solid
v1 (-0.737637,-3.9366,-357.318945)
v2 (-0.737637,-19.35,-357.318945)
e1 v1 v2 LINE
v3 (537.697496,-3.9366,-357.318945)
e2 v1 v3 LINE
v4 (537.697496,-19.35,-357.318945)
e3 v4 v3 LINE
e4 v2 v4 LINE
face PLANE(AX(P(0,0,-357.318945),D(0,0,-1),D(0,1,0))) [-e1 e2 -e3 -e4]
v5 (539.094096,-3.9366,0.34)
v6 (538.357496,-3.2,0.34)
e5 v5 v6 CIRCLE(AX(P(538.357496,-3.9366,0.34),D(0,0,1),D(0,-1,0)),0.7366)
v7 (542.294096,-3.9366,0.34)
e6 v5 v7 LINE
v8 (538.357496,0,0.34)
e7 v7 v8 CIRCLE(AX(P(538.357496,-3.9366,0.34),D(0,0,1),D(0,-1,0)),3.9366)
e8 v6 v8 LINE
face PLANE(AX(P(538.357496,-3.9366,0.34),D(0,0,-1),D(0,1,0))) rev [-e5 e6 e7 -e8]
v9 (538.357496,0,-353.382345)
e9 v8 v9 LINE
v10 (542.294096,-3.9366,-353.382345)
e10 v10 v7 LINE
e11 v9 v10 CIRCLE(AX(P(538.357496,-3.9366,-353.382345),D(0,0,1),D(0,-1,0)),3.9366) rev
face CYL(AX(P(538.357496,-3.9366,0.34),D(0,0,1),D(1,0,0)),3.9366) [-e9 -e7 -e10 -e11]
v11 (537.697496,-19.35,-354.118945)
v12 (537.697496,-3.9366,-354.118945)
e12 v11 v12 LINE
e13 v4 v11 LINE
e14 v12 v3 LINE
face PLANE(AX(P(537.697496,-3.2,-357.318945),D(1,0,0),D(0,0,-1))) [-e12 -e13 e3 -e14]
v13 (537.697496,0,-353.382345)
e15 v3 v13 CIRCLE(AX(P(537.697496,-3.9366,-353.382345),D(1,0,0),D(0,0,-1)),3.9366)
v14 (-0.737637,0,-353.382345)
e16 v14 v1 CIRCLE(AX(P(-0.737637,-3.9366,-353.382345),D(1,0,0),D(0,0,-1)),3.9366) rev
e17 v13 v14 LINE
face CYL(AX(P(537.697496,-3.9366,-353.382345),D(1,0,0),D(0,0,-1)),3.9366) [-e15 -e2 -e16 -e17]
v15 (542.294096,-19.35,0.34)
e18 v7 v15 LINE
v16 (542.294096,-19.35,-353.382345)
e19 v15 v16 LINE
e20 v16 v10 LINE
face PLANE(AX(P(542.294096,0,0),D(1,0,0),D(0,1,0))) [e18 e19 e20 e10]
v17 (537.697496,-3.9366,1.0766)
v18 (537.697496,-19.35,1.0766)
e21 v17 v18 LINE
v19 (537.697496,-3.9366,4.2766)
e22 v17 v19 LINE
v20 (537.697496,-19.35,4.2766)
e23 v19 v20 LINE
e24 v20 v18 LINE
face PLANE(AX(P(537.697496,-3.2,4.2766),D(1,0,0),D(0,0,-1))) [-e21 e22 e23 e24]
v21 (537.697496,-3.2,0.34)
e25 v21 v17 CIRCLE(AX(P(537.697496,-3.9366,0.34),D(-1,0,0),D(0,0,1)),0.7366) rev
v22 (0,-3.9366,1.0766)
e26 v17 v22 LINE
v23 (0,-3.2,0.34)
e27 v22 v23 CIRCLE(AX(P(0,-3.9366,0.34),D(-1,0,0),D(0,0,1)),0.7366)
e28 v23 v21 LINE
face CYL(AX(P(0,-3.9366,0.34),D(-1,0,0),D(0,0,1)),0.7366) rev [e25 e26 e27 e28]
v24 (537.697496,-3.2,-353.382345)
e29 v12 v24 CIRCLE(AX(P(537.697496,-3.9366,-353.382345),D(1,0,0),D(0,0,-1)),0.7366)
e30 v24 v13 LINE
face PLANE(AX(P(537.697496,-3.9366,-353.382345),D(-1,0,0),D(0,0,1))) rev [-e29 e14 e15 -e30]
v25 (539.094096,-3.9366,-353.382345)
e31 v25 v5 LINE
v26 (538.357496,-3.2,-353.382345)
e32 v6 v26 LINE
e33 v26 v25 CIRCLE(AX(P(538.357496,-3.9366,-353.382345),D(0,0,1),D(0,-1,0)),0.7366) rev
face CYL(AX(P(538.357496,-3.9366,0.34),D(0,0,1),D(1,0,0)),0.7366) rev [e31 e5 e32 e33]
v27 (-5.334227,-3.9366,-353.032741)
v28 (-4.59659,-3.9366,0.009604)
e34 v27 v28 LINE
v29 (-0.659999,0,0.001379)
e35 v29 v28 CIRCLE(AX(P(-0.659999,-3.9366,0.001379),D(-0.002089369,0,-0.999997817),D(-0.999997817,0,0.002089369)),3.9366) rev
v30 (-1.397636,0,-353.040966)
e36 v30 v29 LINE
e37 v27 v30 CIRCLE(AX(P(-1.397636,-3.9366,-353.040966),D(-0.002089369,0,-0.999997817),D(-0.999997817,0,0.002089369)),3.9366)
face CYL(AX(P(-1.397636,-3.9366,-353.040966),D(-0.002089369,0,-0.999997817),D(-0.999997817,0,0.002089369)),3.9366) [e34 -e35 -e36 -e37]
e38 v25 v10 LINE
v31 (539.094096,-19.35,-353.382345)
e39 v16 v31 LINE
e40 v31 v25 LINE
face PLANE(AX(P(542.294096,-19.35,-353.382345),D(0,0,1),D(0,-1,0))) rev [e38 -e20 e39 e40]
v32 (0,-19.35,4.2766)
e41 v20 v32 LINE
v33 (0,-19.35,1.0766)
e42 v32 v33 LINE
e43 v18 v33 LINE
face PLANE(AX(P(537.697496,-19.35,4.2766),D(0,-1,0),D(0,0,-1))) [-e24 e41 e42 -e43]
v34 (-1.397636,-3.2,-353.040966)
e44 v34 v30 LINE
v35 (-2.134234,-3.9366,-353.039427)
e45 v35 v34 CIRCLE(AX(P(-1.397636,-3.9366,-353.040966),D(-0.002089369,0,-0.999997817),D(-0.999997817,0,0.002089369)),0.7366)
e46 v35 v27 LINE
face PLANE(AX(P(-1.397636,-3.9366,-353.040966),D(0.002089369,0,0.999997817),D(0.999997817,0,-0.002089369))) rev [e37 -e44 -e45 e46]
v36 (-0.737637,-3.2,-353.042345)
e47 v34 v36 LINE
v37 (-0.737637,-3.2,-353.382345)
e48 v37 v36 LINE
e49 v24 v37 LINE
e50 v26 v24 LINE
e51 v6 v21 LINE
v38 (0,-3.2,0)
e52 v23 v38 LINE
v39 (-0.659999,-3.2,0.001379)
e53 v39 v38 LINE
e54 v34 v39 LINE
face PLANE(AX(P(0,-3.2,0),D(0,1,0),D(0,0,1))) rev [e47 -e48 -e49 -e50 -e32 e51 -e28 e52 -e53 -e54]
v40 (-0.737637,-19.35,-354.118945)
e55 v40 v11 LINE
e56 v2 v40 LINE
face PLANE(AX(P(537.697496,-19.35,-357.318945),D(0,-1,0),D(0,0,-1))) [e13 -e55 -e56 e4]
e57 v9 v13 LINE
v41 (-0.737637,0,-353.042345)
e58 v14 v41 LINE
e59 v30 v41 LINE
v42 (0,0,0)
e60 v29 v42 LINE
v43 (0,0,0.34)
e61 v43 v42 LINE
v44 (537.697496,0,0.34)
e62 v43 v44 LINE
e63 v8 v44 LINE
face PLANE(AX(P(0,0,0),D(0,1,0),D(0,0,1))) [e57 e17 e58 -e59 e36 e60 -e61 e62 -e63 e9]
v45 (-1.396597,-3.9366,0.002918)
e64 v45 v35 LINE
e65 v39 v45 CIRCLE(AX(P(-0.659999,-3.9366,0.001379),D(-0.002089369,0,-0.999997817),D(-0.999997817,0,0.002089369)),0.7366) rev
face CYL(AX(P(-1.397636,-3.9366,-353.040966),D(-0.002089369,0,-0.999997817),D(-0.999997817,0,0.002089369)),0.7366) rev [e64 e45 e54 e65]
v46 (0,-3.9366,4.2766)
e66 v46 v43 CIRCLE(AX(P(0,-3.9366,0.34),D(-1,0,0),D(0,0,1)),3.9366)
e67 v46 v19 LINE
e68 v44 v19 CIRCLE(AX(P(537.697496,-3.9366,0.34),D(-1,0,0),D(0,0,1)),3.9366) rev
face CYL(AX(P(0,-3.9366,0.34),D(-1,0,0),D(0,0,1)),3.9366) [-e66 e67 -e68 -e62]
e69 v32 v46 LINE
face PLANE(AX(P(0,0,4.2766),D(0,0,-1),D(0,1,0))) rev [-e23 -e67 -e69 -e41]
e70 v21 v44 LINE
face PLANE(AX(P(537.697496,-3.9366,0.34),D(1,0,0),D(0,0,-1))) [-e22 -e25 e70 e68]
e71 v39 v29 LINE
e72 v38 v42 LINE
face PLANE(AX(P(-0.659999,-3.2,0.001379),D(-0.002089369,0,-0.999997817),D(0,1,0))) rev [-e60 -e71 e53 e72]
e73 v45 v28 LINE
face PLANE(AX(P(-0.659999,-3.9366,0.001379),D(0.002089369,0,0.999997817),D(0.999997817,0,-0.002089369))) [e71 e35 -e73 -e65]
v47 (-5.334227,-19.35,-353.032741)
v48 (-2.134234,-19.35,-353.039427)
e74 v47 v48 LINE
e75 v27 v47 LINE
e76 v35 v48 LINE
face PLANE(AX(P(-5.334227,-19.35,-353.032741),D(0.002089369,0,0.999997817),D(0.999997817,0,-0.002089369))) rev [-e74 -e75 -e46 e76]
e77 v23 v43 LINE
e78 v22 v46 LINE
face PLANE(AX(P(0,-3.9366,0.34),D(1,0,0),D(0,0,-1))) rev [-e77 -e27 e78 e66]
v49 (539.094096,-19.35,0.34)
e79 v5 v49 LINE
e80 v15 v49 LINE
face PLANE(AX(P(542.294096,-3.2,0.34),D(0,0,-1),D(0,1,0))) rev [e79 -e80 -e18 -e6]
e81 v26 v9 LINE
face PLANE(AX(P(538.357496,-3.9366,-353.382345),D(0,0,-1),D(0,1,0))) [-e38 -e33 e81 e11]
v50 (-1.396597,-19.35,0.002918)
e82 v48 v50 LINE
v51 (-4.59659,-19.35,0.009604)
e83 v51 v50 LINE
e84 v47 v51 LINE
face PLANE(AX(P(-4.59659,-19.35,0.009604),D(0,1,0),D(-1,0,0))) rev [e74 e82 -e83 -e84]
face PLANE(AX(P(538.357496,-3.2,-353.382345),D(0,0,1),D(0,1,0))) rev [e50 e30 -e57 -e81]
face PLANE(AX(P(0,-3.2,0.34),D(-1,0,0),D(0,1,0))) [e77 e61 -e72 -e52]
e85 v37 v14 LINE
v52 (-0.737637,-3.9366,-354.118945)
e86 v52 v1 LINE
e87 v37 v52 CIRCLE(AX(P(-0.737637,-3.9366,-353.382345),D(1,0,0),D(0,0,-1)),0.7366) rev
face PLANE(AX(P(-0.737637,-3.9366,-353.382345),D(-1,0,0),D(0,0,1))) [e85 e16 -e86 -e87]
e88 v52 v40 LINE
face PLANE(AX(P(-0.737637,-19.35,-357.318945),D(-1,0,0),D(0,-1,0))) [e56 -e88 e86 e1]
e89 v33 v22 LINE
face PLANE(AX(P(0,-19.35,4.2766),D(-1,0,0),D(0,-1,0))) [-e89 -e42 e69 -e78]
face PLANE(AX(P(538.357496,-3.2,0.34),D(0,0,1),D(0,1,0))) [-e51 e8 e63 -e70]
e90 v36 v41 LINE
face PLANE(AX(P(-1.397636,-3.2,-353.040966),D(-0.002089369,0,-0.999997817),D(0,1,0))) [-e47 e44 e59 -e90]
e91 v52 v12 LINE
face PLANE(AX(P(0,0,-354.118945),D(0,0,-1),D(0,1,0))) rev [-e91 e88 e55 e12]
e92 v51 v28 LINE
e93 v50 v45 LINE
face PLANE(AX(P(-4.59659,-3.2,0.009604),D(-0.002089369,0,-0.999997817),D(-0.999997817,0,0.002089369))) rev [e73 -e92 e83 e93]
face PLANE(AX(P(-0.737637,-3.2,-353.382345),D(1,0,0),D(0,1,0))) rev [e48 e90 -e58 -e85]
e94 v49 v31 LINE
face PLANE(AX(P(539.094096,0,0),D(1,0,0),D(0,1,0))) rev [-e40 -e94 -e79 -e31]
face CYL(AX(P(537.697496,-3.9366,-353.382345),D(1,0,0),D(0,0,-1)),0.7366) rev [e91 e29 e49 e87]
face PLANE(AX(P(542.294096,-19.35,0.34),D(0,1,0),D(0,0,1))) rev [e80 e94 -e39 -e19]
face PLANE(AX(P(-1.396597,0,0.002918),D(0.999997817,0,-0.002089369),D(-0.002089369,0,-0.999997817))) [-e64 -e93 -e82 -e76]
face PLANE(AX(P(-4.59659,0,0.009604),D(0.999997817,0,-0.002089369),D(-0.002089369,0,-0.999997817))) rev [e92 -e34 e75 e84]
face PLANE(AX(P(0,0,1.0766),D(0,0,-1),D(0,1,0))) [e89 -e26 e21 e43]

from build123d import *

# Parameters (mm, degrees)
BASE_FLANGE1_DEPTH       = 3.2
EDGE_FLANGE17_DEPTH      = 538.435133562
EDGE_FLANGE17_BEND_DEPTH = 537.697496226
EDGE_FLANGE18_DEPTH      = 353.722345428
EDGE_FLANGE18_BEND_DEPTH = 353.043116027


# Sheet-metal steps are written as plain solids
with BuildPart() as part:
    # Sketch1 → Base-Flange1 (new body)
    with BuildSketch(Plane(origin=(0, 0, 0), x_dir=(1, 0, 0), z_dir=(0, 1, 0))):
        Polygon((537.697496226, 353.042345428), (0, 353.042345428), (-0.737637336, 353.042345428), (0, 0), (537.697496226, 0), align=None)
    extrude(amount=-BASE_FLANGE1_DEPTH)

    # Edge-Flange17 section (across the edge) → Edge-Flange17 (add)
    with BuildSketch(Plane(origin=(-0.737637336, -3.2, -354.118945428), x_dir=(0, 0, 1), z_dir=(1, 0, 0))):
        with BuildLine():
            Line((-3.2, 0.7366), (-3.2, 16.15))
            Line((-3.2, 16.15), (0, 16.15))
            Line((0, 16.15), (0, 0.7366))
            ThreePointArc((0, 0.7366), (0.215745145, 0.215745145), (0.7366, 0))
            Line((0.7366, 0), (1.0766, 0))
            Line((1.0766, 0), (1.0766, -3.2))
            Line((1.0766, -3.2), (0.7366, -3.2))
            ThreePointArc((0.7366, -3.2), (-2.046996555, -2.046996555), (-3.2, 0.7366))
        make_face()
    extrude(amount=EDGE_FLANGE17_DEPTH)

    # Edge-Flange17 section 2 (across the edge) → Edge-Flange17 bend (add)
    with BuildSketch(Plane(origin=(537.697496226, -3.2, 1.0766), x_dir=(0, 0, -1), z_dir=(-1, 0, 0))):
        with BuildLine():
            Line((-3.2, 0.7366), (-3.2, 16.15))
            Line((-3.2, 16.15), (0, 16.15))
            Line((0, 16.15), (0, 0.7366))
            ThreePointArc((0, 0.7366), (0.215745145, 0.215745145), (0.7366, 0))
            Line((0.7366, 0), (1.0766, 0))
            Line((1.0766, 0), (1.0766, -3.2))
            Line((1.0766, -3.2), (0.7366, -3.2))
            ThreePointArc((0.7366, -3.2), (-2.046996555, -2.046996555), (-3.2, 0.7366))
        make_face()
    extrude(amount=EDGE_FLANGE17_BEND_DEPTH)

    # Edge-Flange18 section (across the edge) → Edge-Flange18 (add)
    with BuildSketch(Plane(origin=(539.094096226, -3.2, -353.382345428), x_dir=(-1, 0, 0), z_dir=(0, 0, 1))):
        with BuildLine():
            Line((-3.2, 0.7366), (-3.2, 16.15))
            Line((-3.2, 16.15), (0, 16.15))
            Line((0, 16.15), (0, 0.7366))
            ThreePointArc((0, 0.7366), (0.215745145, 0.215745145), (0.7366, 0))
            Line((0.7366, 0), (1.3966, 0))
            Line((1.3966, 0), (1.3966, -3.2))
            Line((1.3966, -3.2), (0.7366, -3.2))
            ThreePointArc((0.7366, -3.2), (-2.046996555, -2.046996555), (-3.2, 0.7366))
        make_face()
    extrude(amount=EDGE_FLANGE18_DEPTH)

    # Edge-Flange18 section 2 (across the edge) → Edge-Flange18 bend (add)
    with BuildSketch(Plane(origin=(-1.396596952, -3.2, 0.002918013), x_dir=(0.999997817266246, -3.4914813388431337e-15, -0.0020893689821821237), z_dir=(-0.0020893689821821237, 0, -0.999997817266246))):
        with BuildLine():
            Line((-3.2, 0.7366), (-3.2, 16.15))
            Line((-3.2, 16.15), (0, 16.15))
            Line((0, 16.15), (0, 0.7366))
            ThreePointArc((0, 0.7366), (0.215745145, 0.215745145), (0.7366, 0))
            Line((0.7366, 0), (1.3966, 0))
            Line((1.3966, 0), (1.3966, -3.2))
            Line((1.3966, -3.2), (0.7366, -3.2))
            ThreePointArc((0.7366, -3.2), (-2.046996555, -2.046996555), (-3.2, 0.7366))
        make_face()
    extrude(amount=EDGE_FLANGE18_BEND_DEPTH)


solid = part.part
